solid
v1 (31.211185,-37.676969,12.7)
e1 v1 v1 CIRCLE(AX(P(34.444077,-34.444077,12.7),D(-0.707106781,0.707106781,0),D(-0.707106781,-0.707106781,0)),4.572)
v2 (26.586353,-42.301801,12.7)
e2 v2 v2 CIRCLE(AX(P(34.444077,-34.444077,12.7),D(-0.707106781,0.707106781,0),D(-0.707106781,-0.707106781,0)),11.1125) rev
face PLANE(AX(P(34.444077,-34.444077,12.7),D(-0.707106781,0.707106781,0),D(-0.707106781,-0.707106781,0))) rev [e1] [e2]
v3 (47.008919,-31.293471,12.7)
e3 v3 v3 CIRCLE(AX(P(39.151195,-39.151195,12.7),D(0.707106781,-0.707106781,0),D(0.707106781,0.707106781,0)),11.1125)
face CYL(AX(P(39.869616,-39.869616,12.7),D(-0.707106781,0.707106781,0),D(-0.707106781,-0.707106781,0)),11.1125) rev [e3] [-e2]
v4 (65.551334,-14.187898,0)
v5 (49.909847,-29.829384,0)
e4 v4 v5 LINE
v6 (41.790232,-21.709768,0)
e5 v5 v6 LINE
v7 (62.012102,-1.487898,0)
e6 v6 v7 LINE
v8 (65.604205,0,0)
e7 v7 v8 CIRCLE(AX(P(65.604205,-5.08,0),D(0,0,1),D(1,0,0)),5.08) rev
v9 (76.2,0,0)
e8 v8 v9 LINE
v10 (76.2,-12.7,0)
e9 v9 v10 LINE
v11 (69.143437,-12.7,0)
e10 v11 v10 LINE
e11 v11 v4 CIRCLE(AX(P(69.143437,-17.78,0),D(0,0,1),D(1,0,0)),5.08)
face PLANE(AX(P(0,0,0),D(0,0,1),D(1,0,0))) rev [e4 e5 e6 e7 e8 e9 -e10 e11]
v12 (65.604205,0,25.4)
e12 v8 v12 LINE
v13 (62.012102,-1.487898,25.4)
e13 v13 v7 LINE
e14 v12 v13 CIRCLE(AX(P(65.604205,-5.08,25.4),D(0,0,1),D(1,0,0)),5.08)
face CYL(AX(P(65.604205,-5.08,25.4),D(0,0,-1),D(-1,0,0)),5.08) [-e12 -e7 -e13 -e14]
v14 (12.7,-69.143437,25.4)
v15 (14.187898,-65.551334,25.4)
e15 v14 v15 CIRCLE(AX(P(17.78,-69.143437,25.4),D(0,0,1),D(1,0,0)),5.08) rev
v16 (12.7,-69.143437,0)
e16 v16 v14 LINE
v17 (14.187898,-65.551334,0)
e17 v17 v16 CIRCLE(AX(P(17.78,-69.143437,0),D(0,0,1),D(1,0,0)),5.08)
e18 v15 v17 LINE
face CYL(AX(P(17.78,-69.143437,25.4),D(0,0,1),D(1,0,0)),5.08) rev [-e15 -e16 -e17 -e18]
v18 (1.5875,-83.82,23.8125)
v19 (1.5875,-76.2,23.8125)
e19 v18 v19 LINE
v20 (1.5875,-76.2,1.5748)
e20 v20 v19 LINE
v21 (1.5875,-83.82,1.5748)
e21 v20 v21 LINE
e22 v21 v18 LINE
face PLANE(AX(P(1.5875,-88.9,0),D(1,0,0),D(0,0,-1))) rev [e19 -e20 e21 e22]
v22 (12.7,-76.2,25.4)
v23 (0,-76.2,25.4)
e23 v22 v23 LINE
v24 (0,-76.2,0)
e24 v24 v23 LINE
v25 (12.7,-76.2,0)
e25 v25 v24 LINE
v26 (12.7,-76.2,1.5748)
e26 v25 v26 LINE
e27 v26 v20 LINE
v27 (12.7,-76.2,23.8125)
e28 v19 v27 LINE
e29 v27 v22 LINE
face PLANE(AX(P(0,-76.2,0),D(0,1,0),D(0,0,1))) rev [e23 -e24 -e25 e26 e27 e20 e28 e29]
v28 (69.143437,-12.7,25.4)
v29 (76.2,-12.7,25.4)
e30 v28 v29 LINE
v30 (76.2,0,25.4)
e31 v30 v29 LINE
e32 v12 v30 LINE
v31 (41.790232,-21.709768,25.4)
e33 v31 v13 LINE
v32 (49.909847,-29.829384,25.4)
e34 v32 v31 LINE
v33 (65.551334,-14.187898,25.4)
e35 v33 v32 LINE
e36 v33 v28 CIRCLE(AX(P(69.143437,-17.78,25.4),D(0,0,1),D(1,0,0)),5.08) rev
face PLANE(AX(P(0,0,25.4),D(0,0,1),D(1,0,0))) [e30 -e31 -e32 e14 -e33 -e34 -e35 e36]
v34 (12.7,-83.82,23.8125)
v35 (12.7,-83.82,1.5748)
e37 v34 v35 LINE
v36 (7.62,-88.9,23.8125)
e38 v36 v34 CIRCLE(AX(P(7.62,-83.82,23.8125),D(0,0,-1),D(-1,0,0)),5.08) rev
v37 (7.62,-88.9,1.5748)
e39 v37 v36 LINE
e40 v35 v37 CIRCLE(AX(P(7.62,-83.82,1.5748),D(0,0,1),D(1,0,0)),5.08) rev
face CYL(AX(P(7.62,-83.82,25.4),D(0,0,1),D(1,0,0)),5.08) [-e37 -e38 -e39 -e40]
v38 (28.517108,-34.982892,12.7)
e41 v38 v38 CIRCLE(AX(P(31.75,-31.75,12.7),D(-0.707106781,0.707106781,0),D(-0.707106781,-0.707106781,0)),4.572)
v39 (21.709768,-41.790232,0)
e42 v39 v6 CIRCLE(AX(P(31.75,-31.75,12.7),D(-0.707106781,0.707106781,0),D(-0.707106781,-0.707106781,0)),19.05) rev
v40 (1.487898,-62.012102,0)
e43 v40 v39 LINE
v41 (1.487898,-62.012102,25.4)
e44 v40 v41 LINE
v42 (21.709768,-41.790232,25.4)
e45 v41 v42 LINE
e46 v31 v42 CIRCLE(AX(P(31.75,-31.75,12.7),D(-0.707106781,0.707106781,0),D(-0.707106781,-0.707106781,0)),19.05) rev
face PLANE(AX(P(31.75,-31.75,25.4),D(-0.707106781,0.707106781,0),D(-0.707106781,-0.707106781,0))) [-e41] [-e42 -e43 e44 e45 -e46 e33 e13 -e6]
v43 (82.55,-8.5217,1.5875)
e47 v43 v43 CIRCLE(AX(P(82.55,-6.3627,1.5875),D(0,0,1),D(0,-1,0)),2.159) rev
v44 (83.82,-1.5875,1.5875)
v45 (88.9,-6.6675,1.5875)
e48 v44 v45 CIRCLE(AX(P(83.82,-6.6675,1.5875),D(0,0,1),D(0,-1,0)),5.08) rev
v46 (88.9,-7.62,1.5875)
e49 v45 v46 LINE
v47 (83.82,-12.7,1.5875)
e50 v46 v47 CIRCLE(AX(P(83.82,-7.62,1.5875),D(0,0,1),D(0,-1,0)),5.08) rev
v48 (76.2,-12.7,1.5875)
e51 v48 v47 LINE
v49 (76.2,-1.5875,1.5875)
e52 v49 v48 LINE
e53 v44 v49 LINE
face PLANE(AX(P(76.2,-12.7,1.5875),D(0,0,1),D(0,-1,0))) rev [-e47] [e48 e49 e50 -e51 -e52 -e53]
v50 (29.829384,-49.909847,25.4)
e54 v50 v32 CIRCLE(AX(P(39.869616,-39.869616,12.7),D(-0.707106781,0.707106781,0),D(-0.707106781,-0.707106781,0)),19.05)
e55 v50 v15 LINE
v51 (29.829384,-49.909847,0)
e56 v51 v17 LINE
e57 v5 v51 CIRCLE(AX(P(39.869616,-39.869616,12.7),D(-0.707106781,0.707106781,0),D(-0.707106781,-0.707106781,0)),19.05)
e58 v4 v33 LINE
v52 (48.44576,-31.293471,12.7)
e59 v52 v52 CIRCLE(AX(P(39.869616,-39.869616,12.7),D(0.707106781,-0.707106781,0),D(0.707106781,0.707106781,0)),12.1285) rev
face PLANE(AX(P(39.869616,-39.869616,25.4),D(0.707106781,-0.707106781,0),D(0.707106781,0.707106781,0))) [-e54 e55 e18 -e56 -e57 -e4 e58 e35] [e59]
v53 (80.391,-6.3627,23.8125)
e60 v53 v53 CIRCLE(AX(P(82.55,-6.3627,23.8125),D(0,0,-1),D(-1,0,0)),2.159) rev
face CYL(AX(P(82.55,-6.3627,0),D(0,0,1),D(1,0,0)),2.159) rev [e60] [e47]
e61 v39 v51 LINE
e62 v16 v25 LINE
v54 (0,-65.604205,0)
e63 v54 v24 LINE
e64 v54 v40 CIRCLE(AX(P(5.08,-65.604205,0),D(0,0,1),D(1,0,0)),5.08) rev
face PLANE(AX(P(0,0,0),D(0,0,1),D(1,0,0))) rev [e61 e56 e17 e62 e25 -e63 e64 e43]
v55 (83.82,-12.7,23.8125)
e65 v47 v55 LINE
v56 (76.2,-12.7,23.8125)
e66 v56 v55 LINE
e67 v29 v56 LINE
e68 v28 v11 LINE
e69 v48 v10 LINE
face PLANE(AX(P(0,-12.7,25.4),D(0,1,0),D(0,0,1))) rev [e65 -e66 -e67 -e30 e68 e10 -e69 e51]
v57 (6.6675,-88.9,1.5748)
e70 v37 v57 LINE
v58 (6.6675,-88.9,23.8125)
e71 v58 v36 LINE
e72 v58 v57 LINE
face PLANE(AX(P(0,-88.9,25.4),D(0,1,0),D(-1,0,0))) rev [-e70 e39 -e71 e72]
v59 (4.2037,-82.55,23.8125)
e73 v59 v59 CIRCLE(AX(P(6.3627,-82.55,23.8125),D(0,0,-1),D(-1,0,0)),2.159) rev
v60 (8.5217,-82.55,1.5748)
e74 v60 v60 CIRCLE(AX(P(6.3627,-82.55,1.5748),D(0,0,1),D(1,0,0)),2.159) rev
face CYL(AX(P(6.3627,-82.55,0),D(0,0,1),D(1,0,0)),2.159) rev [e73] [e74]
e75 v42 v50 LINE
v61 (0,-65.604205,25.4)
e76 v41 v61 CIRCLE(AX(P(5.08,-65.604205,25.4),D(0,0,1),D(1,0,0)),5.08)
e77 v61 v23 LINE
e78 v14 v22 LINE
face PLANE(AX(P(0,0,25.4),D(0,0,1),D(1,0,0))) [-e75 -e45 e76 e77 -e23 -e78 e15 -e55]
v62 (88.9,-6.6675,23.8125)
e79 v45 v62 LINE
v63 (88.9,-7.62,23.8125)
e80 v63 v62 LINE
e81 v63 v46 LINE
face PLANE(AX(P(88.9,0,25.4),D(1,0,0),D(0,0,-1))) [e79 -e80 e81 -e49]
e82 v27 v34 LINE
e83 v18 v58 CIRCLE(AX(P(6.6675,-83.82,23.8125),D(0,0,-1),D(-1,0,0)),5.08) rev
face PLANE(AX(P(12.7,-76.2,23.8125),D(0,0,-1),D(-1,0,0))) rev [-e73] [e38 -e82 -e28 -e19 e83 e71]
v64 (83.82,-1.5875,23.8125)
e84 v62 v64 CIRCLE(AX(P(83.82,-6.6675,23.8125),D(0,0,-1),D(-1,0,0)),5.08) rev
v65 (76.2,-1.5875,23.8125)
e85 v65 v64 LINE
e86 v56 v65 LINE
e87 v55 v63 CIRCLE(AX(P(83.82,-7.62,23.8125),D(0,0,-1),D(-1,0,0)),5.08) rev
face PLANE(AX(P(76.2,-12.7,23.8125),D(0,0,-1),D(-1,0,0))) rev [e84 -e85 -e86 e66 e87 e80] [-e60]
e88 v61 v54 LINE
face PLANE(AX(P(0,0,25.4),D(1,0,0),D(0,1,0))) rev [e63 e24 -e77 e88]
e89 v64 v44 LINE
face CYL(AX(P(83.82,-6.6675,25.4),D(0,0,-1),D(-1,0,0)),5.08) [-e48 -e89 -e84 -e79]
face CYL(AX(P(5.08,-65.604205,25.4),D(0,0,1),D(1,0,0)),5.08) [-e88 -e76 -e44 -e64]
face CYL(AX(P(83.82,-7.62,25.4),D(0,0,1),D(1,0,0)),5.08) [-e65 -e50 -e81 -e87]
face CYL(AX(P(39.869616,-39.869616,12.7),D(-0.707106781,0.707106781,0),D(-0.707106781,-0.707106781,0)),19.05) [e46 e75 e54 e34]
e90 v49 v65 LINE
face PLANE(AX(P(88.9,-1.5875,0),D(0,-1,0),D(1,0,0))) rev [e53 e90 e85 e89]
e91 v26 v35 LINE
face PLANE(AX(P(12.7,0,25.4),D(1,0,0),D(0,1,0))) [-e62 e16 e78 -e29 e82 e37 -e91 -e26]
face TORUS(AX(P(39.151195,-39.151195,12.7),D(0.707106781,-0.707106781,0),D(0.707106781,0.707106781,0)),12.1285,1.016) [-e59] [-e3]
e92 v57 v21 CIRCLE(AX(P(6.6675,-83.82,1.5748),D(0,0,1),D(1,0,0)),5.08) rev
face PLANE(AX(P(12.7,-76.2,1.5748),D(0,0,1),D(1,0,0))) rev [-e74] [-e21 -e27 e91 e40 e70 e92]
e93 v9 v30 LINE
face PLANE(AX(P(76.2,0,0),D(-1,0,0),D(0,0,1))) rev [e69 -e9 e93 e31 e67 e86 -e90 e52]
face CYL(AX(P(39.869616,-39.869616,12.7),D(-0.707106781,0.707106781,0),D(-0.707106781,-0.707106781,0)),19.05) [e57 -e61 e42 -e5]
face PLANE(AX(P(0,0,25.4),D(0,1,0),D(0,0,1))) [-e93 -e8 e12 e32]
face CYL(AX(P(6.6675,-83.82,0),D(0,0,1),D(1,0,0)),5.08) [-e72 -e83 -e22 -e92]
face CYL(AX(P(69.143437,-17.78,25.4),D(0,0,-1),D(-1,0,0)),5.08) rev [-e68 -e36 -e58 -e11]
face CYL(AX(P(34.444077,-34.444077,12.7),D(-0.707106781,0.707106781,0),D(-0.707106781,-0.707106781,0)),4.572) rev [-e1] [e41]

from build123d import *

# Parameters (mm, degrees)
BOSS_EXTRUDE1_DEPTH    = 25.4
SKETCH2_R              = 2.159
SKETCH2_W              = 12.7
SKETCH2_H              = 1.5875
SKETCH2_W_2            = 1.5875
SKETCH2_H_2            = 12.7
CUT_EXTRUDE1_DEPTH     = 25.4
SKETCH3_W              = 12.7
SKETCH3_H              = 1.5875
SKETCH3_H_2            = 1.5748
CUT_EXTRUDE2_DEPTH     = 12.7
SKETCH4_W              = 1.5875
SKETCH4_H              = 12.7
CUT_EXTRUDE3_DEPTH     = 12.7
F_3DSKETCH1_R          = 19.05
F_3DSKETCH1_R_2        = 11.1125
BOSS_EXTRUDE2_DEPTH    = 11.482870812
CUT_EXTRUDE4_START     = 44.901280605
CUT_EXTRUDE4_OUTLINE_R = 11.1125
CUT_EXTRUDE4_DEPTH     = 11.482870812
SKETCH5_R              = 11.1125
SKETCH5_R_2            = 4.572
BOSS_EXTRUDE3_DEPTH    = 3.81
FILLET1_R              = 5.08
FILLET2_R              = 1.016


# Read off the part's stored shape, not the designer's step: Cut-Extrude4
with BuildPart() as part:
    # Sketch1 → Boss-Extrude1 (new body)
    with BuildSketch(Plane.XY):
        Polygon((88.9, 0), (63.5, 0), (0, -63.5), (0, -88.9), (12.7, -88.9), (12.7, -67.039231637), (67.039231637, -12.7), (88.9, -12.7), align=None)
    extrude(amount=BOSS_EXTRUDE1_DEPTH)

    # Sketch2 → Cut-Extrude1 (cut)
    with BuildSketch(Plane.XY.offset(25.4)):
        with Locations((82.55, -6.3627)):
            Circle(SKETCH2_R)
        with Locations((6.3627, -82.55)):
            Circle(SKETCH2_R)
        with Locations((82.55, -0.79375)):
            Rectangle(SKETCH2_W, SKETCH2_H)
        with Locations((0.79375, -82.55)):
            Rectangle(SKETCH2_W_2, SKETCH2_H_2)
    extrude(amount=-CUT_EXTRUDE1_DEPTH, mode=Mode.SUBTRACT)

    # Sketch3 → Cut-Extrude2 (cut)
    with BuildSketch(Plane.XZ.offset(88.9)):
        with Locations((6.35, 24.60625)):
            Rectangle(SKETCH3_W, SKETCH3_H)
        with Locations((6.35, 0.7874)):
            Rectangle(SKETCH3_W, SKETCH3_H_2)
    extrude(amount=-CUT_EXTRUDE2_DEPTH, mode=Mode.SUBTRACT)

    # Sketch4 → Cut-Extrude3 (cut)
    with BuildSketch(Plane(origin=(88.9, 0, 0), x_dir=(0, 0, -1), z_dir=(1, 0, 0))):
        with Locations((-0.79375, -6.35)):
            Rectangle(SKETCH4_W, SKETCH4_H)
        with Locations((-24.60625, -6.35)):
            Rectangle(SKETCH4_W, SKETCH4_H)
    extrude(amount=-CUT_EXTRUDE3_DEPTH, mode=Mode.SUBTRACT)

    # 3DSketch1 → Boss-Extrude2 (add)
    with BuildSketch(Plane(origin=(67.039231637, -12.7, 0), x_dir=(-0.6713837490692134, -0.6713837490692195, 0.3138275369873187), z_dir=(0.7071067811865508, -0.7071067811865444, 0))):
        with Locations((40.468086778, 0)):
            Circle(F_3DSKETCH1_R)
        with Locations((40.468086778, 0)):
            Circle(F_3DSKETCH1_R_2, mode=Mode.SUBTRACT)
    extrude(amount=-BOSS_EXTRUDE2_DEPTH)

    # Cut-Extrude4 outline → Cut-Extrude4 (cut)
    with BuildSketch(Plane(origin=(0, 0, 0), x_dir=(0.7071067811865438, 0.7071067811865512, 0), z_dir=(0.7071067811865511, -0.7071067811865441, 0)).offset(CUT_EXTRUDE4_START)):
        with Locations((0, 12.7)):
            Circle(CUT_EXTRUDE4_OUTLINE_R)
    extrude(amount=CUT_EXTRUDE4_DEPTH, mode=Mode.SUBTRACT)

    # Sketch5 → Boss-Extrude3 (add)
    with BuildSketch(Plane(origin=(31.75, -31.75, 0), x_dir=(0, 0, 1), z_dir=(-0.7071067811865476, 0.7071067811865475, 0))):
        with Locations(Location((12.7, 0, 0), (0, 0, 270))):
            Circle(SKETCH5_R)
        with Locations(Location((12.7, 0, 0), (0, 0, 270))):
            Circle(SKETCH5_R_2, mode=Mode.SUBTRACT)
    extrude(amount=-BOSS_EXTRUDE3_DEPTH)

    # Fillet1
    fillet1_edges = [part.edges().sort_by_distance(p)[0] for p in [
        (88.9, -1.5875, 12.7),
        (88.9, -12.7, 12.7),
        (63.5, 0, 12.7),
        (67.039231637, -12.7, 12.7),
        (12.7, -67.039231637, 12.7),
        (0, -63.5, 12.7),
        (1.5875, -88.9, 12.69365),
        (12.7, -88.9, 12.69365),
    ]]
    fillet(fillet1_edges, radius=FILLET1_R)

    # Fillet2
    fillet2_edges = [part.edges().sort_by_distance(p)[0] for p in [
        (32.011891712, -47.727339924, 12.7),
    ]]
    fillet(fillet2_edges, radius=FILLET2_R)


solid = part.part
